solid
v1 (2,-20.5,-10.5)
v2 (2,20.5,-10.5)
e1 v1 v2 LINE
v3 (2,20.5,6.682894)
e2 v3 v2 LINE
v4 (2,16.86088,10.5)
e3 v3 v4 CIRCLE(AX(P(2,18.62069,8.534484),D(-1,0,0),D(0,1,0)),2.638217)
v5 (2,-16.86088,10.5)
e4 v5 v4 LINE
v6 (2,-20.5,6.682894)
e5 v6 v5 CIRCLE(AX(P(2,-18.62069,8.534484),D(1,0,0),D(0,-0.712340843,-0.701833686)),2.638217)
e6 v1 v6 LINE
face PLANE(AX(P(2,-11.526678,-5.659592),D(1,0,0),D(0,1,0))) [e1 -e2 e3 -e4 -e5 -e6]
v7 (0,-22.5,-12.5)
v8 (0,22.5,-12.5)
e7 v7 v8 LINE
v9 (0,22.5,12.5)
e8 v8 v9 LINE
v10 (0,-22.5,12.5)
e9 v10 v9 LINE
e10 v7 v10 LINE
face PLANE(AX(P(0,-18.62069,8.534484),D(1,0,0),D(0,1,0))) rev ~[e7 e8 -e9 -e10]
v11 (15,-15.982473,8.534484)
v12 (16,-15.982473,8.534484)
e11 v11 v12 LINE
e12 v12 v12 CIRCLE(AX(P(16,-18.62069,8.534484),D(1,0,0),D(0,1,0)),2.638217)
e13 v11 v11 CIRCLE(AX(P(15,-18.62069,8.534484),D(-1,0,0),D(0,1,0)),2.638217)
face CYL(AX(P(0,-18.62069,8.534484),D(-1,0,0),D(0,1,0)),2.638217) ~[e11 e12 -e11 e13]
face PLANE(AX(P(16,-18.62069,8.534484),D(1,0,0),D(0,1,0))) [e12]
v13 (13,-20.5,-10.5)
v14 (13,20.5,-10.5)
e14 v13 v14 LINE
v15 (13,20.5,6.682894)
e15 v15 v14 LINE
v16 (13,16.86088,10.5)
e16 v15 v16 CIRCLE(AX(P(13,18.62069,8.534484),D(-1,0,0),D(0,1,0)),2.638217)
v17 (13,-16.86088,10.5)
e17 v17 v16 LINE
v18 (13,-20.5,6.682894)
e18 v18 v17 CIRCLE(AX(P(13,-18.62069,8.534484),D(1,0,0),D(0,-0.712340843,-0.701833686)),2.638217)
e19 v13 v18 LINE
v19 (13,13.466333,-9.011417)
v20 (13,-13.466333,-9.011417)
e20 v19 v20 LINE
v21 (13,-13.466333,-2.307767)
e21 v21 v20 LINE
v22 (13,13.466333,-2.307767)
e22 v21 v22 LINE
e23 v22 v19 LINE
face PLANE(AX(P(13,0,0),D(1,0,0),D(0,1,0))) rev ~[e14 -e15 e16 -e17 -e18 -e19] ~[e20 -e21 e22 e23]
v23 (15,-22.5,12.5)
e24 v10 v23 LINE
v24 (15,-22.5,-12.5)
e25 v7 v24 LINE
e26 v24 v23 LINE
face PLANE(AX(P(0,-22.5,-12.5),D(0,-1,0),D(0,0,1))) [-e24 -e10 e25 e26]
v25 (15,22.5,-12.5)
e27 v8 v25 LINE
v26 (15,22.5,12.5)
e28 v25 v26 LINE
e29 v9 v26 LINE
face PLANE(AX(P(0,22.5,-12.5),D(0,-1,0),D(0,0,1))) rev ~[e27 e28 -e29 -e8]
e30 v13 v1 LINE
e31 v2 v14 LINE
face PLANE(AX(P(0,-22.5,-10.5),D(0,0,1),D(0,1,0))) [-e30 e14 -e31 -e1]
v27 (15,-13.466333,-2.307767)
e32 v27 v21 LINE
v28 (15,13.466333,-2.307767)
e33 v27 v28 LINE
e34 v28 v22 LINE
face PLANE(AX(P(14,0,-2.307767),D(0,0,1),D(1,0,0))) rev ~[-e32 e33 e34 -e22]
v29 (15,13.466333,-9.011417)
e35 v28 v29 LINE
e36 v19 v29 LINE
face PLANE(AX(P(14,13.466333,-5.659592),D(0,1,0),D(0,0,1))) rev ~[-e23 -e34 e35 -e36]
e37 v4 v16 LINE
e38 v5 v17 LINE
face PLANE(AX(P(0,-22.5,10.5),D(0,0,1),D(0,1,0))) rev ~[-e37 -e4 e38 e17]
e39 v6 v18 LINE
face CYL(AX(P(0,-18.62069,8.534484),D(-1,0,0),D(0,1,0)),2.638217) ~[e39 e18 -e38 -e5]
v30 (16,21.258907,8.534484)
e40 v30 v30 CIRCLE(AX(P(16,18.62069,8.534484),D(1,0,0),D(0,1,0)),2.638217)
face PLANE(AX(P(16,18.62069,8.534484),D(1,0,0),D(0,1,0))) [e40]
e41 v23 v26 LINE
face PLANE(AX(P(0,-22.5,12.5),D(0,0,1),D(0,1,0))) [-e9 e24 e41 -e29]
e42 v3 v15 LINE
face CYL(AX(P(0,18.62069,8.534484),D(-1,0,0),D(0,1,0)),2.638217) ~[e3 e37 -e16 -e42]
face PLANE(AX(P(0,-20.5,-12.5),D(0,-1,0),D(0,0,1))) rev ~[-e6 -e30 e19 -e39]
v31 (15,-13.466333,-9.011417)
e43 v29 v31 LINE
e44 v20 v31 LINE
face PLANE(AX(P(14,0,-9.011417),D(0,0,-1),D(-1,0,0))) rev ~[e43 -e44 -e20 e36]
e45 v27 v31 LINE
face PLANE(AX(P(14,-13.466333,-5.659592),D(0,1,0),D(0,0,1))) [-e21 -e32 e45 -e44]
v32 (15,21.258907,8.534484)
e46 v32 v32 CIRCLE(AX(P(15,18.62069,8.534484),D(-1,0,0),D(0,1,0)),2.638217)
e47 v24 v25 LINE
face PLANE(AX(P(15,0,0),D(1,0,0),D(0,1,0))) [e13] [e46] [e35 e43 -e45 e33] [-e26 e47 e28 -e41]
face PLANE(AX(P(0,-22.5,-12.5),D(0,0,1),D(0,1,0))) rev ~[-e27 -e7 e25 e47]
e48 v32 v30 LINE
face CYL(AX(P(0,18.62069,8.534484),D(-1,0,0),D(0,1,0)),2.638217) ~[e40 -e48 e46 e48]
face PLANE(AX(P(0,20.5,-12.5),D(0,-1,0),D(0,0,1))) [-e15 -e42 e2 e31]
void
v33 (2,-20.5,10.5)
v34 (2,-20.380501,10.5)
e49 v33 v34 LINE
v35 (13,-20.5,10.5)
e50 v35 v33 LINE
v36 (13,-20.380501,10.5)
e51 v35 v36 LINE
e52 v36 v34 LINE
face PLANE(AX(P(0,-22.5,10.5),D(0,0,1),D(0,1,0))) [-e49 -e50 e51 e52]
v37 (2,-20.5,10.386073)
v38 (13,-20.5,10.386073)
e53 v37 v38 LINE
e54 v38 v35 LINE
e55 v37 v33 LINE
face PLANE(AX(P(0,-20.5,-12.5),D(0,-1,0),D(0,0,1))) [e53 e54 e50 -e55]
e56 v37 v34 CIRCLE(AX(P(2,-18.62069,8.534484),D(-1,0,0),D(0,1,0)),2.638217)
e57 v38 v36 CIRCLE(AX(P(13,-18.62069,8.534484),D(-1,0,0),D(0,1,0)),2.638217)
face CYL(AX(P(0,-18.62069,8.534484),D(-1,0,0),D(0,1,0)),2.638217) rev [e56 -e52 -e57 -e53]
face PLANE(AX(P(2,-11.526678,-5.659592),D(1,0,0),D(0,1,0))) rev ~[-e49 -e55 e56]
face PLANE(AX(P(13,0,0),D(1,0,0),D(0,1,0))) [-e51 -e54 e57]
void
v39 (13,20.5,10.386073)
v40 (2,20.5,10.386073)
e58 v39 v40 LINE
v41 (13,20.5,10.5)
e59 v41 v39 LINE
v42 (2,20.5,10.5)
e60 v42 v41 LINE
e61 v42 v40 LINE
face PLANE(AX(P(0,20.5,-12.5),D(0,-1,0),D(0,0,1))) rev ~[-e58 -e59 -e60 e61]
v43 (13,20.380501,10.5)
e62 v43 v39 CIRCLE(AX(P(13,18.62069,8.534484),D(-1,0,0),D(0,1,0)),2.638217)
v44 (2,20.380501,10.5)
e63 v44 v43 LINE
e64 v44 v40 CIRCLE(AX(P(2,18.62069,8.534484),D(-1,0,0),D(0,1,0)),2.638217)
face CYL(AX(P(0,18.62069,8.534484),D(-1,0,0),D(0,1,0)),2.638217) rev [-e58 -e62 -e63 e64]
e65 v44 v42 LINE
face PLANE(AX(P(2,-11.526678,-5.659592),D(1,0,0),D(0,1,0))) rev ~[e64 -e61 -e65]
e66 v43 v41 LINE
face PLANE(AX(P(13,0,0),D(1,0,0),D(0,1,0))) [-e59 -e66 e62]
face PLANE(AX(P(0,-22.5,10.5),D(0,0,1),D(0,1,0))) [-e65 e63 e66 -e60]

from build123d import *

# Parameters (mm, degrees)
F0_W     = 45
F0_H     = 25
F1_DEPTH = 15
F2_W     = 3.8793105632
F2_H     = 6.7036496475
F2_W_2   = 5.8189658448
F2_W_3   = 7.5361132622
F3_DEPTH = 25
F4_T     = 2
F5_R     = 2.6382169245
F6_DEPTH = 5
F7_DEPTH = 16


# Not quite as in the source:
# - a shell that OpenCascade refuses in one call is made with other operations: the cavity is built on its own and cut out


with BuildPart() as f1:
    # F0 (on Right) → F1 (new body)
    with BuildSketch(Plane.YZ):
        Rectangle(F0_W, F0_H)
    extrude(amount=F1_DEPTH)

    # F2 (on Right) → F3 (join)
    with BuildSketch(Plane.YZ):
        with Locations((-11.5266777575, -5.6595918722)):
            Rectangle(F2_W, F2_H)
        with Locations((-6.6775395535, -5.6595918722)):
            Rectangle(F2_W_2, F2_H)
        with Locations((0, -5.6595918722)):
            Rectangle(F2_W_3, F2_H)
        with Locations((6.6775395535, -5.6595918722)):
            Rectangle(F2_W_2, F2_H)
        with Locations((11.5266777575, -5.6595918722)):
            Rectangle(F2_W, F2_H)
    extrude(amount=F3_DEPTH)

    # F4: shell of thickness 2, made by hand


with BuildPart() as f4_core1:
    # F4_t2: copy of F1
    add(f1.part)

    # the walls: a layer under each face that stays
    f4_faces = [f4_core1.faces().sort_by_distance(p)[0] for p in [
        (7.5, -22.5, 0),
        (7.5, 0, 12.5),
        (7.5, 0, -12.5),
        (0, 0, 0),
        (15, 0, 0),
        (7.5, 22.5, 0),
    ]]
    thicken(f4_faces, amount=-F4_T, mode=Mode.SUBTRACT)


with BuildPart() as f1_1:
    add(f1.part)

    # what is left inside the walls is the cavity
    f4_cavity = [f4_core1.part.solids().sort_by_distance(p)[0] for p in [
        (2.02, 0, -3.5),
    ]]
    add(f4_cavity, mode=Mode.SUBTRACT)

    # F5 (on Right) → F6 (join)
    with BuildSketch(Plane.YZ):
        with Locations((-18.6206903309, 8.5344836116)):
            Circle(F5_R)
        with Locations((18.6206903309, 8.5344836116)):
            Circle(F5_R)
    extrude(amount=F6_DEPTH)

    # F5 (on Right) → F7 (join)
    with BuildSketch(Plane.YZ):
        with Locations((-18.6206903309, 8.5344836116)):
            Circle(F5_R)
        with Locations((18.6206903309, 8.5344836116)):
            Circle(F5_R)
    extrude(amount=F7_DEPTH)


solid = f1_1.part
